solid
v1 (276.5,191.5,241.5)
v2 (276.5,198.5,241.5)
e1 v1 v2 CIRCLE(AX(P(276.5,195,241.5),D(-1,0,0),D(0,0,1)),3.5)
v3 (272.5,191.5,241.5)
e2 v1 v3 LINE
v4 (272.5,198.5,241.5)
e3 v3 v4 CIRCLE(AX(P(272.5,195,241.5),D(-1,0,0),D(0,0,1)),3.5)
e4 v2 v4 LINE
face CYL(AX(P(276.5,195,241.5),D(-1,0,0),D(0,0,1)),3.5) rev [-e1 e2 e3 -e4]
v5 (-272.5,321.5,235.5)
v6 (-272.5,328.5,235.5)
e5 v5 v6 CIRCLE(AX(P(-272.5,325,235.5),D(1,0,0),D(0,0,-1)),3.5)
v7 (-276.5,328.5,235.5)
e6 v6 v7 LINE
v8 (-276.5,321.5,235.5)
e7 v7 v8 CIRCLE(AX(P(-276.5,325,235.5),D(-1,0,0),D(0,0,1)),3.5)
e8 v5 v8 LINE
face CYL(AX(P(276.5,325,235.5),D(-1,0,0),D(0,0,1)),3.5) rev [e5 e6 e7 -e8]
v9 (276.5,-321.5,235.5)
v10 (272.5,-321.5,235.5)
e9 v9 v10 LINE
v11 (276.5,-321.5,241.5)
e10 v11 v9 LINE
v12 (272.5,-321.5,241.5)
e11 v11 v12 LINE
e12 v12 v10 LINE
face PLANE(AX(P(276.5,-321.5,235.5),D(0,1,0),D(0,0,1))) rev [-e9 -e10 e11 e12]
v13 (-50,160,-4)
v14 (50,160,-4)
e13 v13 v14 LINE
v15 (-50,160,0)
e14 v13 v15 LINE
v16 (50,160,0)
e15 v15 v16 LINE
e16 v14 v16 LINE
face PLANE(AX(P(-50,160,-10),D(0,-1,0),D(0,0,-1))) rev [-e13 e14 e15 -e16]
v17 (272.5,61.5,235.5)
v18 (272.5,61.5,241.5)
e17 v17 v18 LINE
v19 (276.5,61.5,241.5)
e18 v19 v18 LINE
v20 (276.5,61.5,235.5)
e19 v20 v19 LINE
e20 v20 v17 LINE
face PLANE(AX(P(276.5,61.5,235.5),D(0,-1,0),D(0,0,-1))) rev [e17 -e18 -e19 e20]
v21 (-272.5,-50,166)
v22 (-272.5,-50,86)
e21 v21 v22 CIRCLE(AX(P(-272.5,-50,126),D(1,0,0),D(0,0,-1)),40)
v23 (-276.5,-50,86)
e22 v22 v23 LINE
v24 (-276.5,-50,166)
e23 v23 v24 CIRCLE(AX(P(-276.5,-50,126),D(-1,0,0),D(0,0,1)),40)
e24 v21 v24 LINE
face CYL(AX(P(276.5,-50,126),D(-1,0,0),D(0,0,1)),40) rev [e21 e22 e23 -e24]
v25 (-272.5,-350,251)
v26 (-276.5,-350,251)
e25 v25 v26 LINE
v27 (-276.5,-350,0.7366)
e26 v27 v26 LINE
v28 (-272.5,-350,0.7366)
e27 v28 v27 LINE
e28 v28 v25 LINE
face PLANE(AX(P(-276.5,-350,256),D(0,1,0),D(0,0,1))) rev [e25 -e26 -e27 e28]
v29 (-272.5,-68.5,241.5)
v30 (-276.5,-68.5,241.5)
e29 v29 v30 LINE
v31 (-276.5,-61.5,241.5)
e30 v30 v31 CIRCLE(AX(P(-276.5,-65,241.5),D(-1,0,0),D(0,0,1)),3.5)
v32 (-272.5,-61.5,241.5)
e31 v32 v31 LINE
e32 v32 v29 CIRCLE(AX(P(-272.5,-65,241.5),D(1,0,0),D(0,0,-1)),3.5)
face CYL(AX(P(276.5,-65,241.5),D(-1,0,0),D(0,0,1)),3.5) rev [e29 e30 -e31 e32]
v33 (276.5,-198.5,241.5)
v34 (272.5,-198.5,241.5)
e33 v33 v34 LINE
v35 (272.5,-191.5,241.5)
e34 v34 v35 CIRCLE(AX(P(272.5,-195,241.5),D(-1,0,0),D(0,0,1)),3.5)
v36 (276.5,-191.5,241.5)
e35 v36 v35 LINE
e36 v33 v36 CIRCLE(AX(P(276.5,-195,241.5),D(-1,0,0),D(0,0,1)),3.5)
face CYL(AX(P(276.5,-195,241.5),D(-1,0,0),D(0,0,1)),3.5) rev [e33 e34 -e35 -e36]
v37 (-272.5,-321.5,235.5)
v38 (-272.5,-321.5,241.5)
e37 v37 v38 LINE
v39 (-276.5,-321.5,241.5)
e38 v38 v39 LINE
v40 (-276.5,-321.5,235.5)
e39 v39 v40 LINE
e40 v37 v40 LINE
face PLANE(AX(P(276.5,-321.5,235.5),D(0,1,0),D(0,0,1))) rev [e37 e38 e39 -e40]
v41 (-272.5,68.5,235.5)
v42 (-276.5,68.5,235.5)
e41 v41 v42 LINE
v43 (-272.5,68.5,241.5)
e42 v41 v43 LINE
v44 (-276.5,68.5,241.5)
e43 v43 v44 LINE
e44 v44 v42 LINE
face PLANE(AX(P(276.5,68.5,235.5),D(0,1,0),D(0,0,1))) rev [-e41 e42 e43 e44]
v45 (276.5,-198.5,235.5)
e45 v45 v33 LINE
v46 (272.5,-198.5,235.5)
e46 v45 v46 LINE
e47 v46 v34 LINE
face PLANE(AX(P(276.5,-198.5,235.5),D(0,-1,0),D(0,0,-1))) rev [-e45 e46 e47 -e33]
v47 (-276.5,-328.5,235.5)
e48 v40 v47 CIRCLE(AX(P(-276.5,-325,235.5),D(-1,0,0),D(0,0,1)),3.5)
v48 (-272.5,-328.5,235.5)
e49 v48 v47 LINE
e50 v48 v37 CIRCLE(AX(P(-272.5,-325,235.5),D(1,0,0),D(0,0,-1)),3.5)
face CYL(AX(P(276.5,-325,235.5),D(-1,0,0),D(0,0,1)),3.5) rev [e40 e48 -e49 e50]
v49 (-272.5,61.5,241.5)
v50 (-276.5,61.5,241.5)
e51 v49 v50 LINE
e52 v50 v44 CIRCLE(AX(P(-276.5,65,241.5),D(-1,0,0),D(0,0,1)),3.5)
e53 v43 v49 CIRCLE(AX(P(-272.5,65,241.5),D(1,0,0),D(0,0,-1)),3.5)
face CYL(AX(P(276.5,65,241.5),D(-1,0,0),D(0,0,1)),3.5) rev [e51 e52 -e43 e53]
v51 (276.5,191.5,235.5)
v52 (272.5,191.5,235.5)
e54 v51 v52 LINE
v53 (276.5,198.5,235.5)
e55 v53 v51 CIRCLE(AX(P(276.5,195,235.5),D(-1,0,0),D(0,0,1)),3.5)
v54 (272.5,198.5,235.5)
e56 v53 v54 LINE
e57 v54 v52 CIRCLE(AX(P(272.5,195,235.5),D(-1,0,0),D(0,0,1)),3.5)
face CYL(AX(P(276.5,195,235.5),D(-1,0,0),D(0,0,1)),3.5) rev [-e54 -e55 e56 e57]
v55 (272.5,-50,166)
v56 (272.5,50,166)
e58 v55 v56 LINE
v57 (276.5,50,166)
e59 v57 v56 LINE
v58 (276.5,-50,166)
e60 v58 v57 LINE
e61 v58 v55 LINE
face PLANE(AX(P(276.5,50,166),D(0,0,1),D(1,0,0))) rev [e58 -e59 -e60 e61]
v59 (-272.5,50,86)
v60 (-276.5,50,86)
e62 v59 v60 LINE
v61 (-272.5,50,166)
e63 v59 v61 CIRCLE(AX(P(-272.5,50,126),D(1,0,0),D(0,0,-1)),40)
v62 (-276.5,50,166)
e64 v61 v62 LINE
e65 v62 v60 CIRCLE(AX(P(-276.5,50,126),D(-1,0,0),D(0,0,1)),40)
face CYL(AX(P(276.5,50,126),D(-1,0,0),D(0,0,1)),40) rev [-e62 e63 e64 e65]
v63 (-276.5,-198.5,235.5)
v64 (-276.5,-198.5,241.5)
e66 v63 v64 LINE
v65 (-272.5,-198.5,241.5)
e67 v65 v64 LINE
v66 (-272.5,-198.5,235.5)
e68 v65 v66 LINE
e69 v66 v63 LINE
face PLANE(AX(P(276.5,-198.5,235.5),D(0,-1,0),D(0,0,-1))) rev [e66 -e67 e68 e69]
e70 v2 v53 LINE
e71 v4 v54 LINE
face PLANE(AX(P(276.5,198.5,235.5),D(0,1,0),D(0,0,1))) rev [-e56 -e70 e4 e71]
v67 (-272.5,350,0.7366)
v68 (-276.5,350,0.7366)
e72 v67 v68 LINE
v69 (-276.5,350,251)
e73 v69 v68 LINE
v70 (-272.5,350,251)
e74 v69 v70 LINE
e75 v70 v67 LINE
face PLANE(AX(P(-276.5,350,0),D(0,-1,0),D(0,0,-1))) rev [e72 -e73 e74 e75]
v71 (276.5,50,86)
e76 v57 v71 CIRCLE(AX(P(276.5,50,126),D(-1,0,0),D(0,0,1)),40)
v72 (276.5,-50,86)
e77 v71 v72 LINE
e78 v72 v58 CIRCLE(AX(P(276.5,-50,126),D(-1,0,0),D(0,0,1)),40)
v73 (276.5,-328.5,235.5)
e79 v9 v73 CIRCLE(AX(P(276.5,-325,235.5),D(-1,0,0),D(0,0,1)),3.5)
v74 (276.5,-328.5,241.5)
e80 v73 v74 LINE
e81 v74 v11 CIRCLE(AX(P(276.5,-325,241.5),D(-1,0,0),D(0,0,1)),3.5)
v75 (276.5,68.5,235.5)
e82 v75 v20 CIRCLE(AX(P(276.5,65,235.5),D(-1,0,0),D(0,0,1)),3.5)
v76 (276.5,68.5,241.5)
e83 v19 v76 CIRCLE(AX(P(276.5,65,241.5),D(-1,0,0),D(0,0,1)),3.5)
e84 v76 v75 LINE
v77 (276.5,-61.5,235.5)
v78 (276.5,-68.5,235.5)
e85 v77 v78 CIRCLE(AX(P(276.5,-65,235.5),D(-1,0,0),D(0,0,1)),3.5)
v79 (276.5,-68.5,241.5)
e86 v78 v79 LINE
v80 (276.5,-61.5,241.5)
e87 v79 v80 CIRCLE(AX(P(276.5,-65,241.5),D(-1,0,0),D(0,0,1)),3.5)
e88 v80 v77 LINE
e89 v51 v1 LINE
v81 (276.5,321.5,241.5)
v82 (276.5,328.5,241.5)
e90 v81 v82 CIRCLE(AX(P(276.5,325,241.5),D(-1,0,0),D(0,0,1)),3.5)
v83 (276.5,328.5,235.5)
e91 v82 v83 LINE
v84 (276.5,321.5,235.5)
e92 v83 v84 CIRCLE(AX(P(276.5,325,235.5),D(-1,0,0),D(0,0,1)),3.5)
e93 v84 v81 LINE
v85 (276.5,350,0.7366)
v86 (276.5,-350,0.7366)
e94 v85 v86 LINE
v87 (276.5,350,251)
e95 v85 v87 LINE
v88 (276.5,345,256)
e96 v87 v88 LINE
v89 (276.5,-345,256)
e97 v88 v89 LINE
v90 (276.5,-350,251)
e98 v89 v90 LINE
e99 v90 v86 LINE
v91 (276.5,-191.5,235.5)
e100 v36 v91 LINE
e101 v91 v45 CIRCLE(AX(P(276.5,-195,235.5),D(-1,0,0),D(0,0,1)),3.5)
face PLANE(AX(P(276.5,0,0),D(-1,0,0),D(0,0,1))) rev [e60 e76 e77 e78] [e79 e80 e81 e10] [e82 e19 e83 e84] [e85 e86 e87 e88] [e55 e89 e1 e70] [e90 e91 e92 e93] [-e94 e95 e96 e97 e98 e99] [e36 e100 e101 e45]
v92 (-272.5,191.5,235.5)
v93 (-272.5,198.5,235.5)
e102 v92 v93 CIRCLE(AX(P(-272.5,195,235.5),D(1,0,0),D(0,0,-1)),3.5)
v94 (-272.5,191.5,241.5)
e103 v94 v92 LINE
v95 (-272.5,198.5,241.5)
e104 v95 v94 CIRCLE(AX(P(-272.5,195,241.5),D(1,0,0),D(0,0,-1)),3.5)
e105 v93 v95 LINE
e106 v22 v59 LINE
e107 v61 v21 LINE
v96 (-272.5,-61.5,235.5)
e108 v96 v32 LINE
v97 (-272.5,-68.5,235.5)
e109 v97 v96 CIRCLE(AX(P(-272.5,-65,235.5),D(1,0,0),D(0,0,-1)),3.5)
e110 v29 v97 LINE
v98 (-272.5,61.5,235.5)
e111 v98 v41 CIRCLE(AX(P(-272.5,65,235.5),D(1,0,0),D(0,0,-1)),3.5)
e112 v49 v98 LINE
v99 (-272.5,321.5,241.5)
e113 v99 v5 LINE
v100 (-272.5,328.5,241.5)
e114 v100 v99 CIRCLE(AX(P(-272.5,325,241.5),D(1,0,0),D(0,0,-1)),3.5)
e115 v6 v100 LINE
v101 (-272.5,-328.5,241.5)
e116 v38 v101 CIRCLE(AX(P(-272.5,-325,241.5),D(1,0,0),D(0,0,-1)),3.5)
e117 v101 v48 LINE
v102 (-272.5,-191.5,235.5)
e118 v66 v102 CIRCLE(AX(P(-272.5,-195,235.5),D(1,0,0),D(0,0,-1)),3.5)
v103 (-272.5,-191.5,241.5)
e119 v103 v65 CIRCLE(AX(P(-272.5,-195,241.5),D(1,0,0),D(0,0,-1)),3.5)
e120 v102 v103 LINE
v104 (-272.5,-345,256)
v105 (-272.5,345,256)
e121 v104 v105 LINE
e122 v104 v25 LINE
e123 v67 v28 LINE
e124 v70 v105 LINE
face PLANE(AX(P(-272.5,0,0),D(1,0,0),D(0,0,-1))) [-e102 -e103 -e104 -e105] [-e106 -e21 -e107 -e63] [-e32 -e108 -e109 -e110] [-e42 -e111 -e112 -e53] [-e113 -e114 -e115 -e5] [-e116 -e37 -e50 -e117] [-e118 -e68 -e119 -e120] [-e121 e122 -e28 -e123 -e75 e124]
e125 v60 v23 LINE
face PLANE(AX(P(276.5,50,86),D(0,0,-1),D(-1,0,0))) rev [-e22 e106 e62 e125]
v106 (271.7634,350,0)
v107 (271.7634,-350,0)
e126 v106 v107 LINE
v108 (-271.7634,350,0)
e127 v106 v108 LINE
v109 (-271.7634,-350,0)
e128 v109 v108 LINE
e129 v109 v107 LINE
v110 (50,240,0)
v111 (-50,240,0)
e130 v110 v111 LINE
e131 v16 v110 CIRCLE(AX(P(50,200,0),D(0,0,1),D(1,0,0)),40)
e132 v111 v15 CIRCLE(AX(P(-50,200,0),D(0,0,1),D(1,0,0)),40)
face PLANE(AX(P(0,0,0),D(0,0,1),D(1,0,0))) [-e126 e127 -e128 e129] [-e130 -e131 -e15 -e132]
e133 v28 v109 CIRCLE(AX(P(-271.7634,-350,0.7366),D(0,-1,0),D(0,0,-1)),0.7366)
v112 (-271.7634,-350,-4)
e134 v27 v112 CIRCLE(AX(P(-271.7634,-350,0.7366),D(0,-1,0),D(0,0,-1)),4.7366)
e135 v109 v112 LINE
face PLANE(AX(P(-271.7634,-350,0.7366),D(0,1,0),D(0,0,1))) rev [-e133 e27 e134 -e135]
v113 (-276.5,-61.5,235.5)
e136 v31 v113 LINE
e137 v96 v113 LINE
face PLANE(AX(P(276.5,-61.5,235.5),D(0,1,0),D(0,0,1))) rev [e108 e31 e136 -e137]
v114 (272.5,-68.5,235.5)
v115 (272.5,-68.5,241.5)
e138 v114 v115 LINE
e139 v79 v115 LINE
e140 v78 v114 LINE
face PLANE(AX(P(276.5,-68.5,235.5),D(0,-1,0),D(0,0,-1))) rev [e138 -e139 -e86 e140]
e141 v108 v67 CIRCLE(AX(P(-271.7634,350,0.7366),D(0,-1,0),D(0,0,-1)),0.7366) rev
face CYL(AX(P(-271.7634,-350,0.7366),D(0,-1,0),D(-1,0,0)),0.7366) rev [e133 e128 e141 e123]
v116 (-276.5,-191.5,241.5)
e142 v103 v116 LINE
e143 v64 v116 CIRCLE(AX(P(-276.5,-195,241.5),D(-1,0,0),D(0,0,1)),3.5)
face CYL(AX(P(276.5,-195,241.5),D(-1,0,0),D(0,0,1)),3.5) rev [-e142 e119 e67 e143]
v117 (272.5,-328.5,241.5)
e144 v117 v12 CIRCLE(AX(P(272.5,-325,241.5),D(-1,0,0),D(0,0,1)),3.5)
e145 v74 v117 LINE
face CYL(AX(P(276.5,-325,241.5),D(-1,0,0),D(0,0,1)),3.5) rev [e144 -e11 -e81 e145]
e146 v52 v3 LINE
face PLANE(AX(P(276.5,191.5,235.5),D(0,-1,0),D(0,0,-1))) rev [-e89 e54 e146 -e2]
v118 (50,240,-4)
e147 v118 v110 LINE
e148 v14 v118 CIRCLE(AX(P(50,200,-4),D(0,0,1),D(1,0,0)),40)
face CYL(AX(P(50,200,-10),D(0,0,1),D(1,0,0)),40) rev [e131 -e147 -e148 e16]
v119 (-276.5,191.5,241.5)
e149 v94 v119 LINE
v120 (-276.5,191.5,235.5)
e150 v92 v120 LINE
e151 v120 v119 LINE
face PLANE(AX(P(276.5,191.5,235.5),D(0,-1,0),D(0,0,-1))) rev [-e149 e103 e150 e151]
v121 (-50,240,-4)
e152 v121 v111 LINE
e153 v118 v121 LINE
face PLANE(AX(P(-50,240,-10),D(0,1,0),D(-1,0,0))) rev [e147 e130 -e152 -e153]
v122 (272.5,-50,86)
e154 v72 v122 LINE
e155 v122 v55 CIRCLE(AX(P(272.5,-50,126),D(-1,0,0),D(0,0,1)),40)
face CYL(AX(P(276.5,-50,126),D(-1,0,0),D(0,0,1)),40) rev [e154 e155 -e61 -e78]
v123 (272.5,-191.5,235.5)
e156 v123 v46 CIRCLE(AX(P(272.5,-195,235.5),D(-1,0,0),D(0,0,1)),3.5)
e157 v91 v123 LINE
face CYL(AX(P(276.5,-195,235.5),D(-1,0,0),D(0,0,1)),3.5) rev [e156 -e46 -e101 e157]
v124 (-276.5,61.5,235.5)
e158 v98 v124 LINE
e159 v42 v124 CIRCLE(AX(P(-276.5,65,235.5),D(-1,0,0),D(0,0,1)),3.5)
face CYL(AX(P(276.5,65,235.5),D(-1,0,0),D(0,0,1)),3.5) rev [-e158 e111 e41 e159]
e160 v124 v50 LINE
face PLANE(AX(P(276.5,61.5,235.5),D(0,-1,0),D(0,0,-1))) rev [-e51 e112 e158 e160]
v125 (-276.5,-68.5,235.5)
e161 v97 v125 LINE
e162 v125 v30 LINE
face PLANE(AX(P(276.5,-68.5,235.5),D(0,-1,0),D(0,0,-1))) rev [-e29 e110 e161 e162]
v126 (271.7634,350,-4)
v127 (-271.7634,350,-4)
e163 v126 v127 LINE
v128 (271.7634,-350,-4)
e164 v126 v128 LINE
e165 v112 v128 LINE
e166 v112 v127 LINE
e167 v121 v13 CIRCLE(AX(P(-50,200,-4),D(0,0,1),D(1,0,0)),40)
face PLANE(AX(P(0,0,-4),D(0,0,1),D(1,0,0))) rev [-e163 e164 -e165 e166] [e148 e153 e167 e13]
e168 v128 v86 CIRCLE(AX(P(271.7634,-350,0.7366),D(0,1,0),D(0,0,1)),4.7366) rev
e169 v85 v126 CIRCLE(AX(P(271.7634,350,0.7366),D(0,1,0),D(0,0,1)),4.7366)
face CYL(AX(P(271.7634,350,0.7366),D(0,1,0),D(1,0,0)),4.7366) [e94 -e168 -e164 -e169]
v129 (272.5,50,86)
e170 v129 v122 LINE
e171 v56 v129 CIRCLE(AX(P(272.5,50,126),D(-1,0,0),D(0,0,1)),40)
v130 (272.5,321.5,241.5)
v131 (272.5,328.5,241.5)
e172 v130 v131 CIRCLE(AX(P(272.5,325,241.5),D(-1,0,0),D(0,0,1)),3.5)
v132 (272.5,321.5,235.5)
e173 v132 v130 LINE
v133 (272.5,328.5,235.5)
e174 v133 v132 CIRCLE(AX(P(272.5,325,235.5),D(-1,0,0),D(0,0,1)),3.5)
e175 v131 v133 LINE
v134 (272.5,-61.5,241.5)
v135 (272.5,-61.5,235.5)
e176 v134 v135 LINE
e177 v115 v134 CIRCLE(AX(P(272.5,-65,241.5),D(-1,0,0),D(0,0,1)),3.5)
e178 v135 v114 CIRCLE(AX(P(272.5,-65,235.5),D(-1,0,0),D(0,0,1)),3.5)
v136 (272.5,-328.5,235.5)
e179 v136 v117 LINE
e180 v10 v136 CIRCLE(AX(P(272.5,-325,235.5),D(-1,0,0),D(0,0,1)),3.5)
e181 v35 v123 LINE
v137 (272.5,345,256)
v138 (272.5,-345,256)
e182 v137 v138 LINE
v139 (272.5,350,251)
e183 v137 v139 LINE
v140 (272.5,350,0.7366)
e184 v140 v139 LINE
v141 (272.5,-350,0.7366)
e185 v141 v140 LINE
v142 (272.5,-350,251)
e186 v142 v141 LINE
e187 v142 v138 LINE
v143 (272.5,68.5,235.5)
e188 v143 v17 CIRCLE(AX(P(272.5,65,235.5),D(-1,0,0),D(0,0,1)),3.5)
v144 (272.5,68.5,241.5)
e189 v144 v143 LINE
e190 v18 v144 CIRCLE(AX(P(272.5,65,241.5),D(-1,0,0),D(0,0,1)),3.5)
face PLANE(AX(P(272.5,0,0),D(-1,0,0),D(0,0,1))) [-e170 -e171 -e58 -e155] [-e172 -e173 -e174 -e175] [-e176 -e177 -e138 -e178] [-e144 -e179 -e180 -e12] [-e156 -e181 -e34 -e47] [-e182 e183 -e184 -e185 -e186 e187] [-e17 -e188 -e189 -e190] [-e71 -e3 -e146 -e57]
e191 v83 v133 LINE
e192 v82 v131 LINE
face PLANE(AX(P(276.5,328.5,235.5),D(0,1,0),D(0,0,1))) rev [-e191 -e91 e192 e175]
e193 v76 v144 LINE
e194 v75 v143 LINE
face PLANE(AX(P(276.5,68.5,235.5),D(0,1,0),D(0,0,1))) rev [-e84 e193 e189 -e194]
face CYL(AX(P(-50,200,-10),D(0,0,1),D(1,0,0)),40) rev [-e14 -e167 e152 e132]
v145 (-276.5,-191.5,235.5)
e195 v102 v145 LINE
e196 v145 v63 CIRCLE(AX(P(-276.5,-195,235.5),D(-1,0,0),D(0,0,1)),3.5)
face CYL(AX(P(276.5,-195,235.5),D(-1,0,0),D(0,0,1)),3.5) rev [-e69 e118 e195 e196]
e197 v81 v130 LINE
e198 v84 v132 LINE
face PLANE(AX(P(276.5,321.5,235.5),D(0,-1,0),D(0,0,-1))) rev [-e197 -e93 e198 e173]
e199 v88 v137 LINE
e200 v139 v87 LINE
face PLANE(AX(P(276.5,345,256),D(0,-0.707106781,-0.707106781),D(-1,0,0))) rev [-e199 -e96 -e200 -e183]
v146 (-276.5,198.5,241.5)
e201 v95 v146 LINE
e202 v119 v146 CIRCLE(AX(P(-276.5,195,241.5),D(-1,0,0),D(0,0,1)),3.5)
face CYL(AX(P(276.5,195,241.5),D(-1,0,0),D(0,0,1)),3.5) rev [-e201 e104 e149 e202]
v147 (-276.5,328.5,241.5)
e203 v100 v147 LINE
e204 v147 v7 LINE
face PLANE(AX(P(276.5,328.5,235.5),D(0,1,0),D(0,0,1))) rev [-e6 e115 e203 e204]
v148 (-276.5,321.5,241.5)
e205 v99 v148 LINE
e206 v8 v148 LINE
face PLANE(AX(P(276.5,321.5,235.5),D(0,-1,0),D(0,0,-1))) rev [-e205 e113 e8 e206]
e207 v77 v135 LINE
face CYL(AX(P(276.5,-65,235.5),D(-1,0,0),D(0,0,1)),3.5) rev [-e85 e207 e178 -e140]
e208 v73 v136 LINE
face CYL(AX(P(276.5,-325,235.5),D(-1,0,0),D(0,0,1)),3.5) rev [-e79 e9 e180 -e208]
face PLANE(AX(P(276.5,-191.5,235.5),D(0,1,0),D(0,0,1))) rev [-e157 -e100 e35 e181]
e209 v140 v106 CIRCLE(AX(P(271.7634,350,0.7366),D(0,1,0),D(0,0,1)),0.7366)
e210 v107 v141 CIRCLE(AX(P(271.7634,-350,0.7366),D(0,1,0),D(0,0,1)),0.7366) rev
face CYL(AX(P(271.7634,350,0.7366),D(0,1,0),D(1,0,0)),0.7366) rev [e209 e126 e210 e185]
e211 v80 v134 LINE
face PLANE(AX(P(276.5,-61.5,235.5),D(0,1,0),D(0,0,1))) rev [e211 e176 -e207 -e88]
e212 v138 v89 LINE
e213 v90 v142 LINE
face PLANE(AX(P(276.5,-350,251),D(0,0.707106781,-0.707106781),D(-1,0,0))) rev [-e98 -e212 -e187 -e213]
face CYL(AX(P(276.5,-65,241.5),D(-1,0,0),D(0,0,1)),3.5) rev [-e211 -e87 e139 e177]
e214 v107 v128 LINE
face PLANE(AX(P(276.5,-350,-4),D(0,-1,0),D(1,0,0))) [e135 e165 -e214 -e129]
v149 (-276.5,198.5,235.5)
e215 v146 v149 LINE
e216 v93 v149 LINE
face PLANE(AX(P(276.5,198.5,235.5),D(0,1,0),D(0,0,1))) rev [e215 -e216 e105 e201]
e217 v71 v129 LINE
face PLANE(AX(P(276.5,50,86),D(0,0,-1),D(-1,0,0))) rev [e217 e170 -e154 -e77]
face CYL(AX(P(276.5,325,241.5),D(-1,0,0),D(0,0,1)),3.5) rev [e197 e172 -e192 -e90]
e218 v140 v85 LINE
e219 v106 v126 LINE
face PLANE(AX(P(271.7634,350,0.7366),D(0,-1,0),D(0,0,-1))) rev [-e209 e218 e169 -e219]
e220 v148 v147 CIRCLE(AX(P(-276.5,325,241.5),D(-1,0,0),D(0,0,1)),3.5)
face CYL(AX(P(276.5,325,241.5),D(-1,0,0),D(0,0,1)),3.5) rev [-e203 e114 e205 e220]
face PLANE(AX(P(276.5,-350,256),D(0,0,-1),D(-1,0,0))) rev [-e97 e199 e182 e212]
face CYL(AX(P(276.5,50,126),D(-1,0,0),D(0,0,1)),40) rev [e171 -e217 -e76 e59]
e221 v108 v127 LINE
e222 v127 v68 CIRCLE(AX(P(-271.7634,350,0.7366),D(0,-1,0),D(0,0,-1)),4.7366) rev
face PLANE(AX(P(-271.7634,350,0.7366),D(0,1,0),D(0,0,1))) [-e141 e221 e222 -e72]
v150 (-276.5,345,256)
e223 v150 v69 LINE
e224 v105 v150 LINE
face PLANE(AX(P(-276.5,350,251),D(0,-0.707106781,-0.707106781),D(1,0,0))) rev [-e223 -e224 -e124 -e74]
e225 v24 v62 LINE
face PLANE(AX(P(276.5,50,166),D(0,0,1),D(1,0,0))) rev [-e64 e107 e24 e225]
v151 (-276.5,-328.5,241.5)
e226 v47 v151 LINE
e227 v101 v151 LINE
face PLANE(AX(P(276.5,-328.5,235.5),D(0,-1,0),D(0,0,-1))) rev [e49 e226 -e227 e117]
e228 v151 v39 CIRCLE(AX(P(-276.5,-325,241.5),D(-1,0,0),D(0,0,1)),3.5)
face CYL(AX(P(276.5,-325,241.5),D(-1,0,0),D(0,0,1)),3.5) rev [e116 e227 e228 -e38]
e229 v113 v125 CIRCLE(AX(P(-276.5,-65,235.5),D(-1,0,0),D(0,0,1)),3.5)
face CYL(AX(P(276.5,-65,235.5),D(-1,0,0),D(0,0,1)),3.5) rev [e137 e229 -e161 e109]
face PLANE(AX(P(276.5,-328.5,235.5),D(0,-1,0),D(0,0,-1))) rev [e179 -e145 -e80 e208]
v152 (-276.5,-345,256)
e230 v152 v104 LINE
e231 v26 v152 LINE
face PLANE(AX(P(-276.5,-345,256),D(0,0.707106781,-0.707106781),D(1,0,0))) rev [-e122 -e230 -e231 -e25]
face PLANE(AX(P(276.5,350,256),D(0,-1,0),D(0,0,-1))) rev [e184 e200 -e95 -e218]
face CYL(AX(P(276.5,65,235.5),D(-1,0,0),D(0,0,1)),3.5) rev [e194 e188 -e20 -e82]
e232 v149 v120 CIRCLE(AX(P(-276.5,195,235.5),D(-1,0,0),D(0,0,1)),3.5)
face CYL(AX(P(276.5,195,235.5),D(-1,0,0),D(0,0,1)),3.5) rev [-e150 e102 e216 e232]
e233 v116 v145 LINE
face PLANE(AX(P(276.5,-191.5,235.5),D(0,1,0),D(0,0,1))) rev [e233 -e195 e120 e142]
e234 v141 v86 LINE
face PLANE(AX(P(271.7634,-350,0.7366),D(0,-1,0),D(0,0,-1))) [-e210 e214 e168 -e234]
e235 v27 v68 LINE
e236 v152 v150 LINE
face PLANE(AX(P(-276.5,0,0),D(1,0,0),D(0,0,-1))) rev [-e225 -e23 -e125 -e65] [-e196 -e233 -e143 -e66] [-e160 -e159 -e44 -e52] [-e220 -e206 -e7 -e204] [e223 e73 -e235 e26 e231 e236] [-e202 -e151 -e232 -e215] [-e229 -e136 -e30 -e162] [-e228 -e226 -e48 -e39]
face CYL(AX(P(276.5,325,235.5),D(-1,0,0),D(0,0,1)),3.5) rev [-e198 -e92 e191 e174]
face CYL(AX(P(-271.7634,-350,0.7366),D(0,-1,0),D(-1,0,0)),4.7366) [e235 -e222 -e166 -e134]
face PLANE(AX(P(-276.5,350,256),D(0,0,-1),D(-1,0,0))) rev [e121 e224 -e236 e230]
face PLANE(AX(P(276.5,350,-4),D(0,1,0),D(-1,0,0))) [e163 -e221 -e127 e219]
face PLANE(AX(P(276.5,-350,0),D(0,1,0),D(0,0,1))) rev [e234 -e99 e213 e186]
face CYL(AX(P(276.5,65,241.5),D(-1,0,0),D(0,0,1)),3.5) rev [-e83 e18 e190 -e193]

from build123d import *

# Parameters (mm, degrees)
SKETCH_1_W                         = 553
SKETCH_1_H                         = 700
SM_BASE_FLANGE_1_DEPTH             = 4
SM_EDGE_FLANGE_1_STRIP_W           = 17.4732
SM_EDGE_FLANGE_1_STRIP_H           = 4
SM_EDGE_FLANGE_1_STRIP_CUT_DEPTH   = 700
SM_EDGE_FLANGE_1_STRIP_2_W         = 17.4732
SM_EDGE_FLANGE_1_STRIP_2_H         = 4
SM_EDGE_FLANGE_1_STRIP_CUT_2_DEPTH = 700
SM_EDGE_FLANGE_1_DEPTH             = 700
SM_EDGE_FLANGE_1_BEND_DEPTH        = 700
CUT_EXTRUDE_1_DEPTH                = 703.741061843
CUT_EXTRUDE_2_DEPTH                = 10
CHAMFER_1_SIZE                     = 5
CUT_EXTRUDE_3_DEPTH                = 703.741061843
PATTERN_LINEAR_1_COUNT             = 6
PATTERN_LINEAR_1_PITCH             = 130


# Sheet-metal steps are written as plain solids
with BuildPart() as part:
    # Sketch 1 → 基体-法兰1 (new body)
    with BuildSketch(Plane.XY):
        Rectangle(SKETCH_1_W, SKETCH_1_H)
    extrude(amount=-SM_BASE_FLANGE_1_DEPTH)

    # 边线-法兰1 strip (across the edge) → 边线-法兰1 strip cut (cut)
    with BuildSketch(Plane(origin=(-276.5, 350, 0), x_dir=(1, 0, 0), z_dir=(0, -1, 0))):
        with Locations((-4, -2)):
            Rectangle(SM_EDGE_FLANGE_1_STRIP_W, SM_EDGE_FLANGE_1_STRIP_H)
    extrude(amount=SM_EDGE_FLANGE_1_STRIP_CUT_DEPTH, mode=Mode.SUBTRACT)

    # 边线-法兰1 strip 2 (across the edge) → 边线-法兰1 strip cut 2 (cut)
    with BuildSketch(Plane(origin=(276.5, -350, 0), x_dir=(-1, 0, 0), z_dir=(0, 1, 0))):
        with Locations((-4, -2)):
            Rectangle(SM_EDGE_FLANGE_1_STRIP_2_W, SM_EDGE_FLANGE_1_STRIP_2_H)
    extrude(amount=SM_EDGE_FLANGE_1_STRIP_CUT_2_DEPTH, mode=Mode.SUBTRACT)

    # 边线-法兰1 section (across the edge) → 边线-法兰1 (add)
    with BuildSketch(Plane(origin=(-276.5, 350, 0), x_dir=(1, 0, 0), z_dir=(0, -1, 0))):
        with BuildLine():
            Line((0, 0.7366), (0, 256))
            Line((0, 256), (4, 256))
            Line((4, 256), (4, 0.7366))
            ThreePointArc((4, 0.7366), (4.215745145, 0.215745145), (4.7366, 0))
            Line((4.7366, 0), (4.7366, -4))
            ThreePointArc((4.7366, -4), (1.38731802, -2.61268198), (0, 0.7366))
        make_face()
    extrude(amount=SM_EDGE_FLANGE_1_DEPTH)

    # 边线-法兰1 section 2 (across the edge) → 边线-法兰1 bend (add)
    with BuildSketch(Plane(origin=(276.5, -350, 0), x_dir=(-1, 0, 0), z_dir=(0, 1, 0))):
        with BuildLine():
            Line((0, 0.7366), (0, 256))
            Line((0, 256), (4, 256))
            Line((4, 256), (4, 0.7366))
            ThreePointArc((4, 0.7366), (4.215745145, 0.215745145), (4.7366, 0))
            Line((4.7366, 0), (4.7366, -4))
            ThreePointArc((4.7366, -4), (1.38731802, -2.61268198), (0, 0.7366))
        make_face()
    extrude(amount=SM_EDGE_FLANGE_1_BEND_DEPTH)

    # 草图15 → 切除-拉伸1 (cut, through all)
    with BuildSketch(Plane.ZY.offset(276.5)):
        with BuildLine():
            Line((166, 50), (166, -50))
            ThreePointArc((166, -50), (126, -90), (86, -50))
            Line((86, -50), (86, 50))
            ThreePointArc((86, 50), (126, 90), (166, 50))
        make_face()
    extrude(amount=-CUT_EXTRUDE_1_DEPTH, mode=Mode.SUBTRACT)

    # 草图16 → 切除-拉伸2 (cut)
    with BuildSketch(Plane.XY):
        with BuildLine():
            Line((-50, 240), (50, 240))
            ThreePointArc((50, 240), (90, 200), (50, 160))
            Line((50, 160), (-50, 160))
            ThreePointArc((-50, 160), (-90, 200), (-50, 240))
        make_face()
    extrude(amount=-CUT_EXTRUDE_2_DEPTH, mode=Mode.SUBTRACT)

    # 倒角1
    chamfer_1_edges = [part.edges().sort_by_distance(p)[0] for p in [
        (-274.5, 350, 256),
        (-274.5, -350, 256),
        (274.5, -350, 256),
        (274.5, 350, 256),
    ]]
    chamfer(chamfer_1_edges, length=CHAMFER_1_SIZE)

    # 草图17 → 切除-拉伸3 (cut, through all)
    with BuildSketch(Plane.ZY.offset(276.5)):
        with BuildLine():
            Line((235.5, 328.5), (241.5, 328.5))
            ThreePointArc((241.5, 328.5), (245, 325), (241.5, 321.5))
            Line((241.5, 321.5), (235.5, 321.5))
            ThreePointArc((235.5, 321.5), (232, 325), (235.5, 328.5))
        make_face()
    cut_extrude_3 = extrude(amount=-CUT_EXTRUDE_3_DEPTH, mode=Mode.SUBTRACT)

    # 阵列(线性)1: 切除-拉伸3 ×6
    with Locations(*[(0, -i * PATTERN_LINEAR_1_PITCH, 0) for i in range(1, PATTERN_LINEAR_1_COUNT)]):
        add(cut_extrude_3, mode=Mode.SUBTRACT)


solid = part.part
